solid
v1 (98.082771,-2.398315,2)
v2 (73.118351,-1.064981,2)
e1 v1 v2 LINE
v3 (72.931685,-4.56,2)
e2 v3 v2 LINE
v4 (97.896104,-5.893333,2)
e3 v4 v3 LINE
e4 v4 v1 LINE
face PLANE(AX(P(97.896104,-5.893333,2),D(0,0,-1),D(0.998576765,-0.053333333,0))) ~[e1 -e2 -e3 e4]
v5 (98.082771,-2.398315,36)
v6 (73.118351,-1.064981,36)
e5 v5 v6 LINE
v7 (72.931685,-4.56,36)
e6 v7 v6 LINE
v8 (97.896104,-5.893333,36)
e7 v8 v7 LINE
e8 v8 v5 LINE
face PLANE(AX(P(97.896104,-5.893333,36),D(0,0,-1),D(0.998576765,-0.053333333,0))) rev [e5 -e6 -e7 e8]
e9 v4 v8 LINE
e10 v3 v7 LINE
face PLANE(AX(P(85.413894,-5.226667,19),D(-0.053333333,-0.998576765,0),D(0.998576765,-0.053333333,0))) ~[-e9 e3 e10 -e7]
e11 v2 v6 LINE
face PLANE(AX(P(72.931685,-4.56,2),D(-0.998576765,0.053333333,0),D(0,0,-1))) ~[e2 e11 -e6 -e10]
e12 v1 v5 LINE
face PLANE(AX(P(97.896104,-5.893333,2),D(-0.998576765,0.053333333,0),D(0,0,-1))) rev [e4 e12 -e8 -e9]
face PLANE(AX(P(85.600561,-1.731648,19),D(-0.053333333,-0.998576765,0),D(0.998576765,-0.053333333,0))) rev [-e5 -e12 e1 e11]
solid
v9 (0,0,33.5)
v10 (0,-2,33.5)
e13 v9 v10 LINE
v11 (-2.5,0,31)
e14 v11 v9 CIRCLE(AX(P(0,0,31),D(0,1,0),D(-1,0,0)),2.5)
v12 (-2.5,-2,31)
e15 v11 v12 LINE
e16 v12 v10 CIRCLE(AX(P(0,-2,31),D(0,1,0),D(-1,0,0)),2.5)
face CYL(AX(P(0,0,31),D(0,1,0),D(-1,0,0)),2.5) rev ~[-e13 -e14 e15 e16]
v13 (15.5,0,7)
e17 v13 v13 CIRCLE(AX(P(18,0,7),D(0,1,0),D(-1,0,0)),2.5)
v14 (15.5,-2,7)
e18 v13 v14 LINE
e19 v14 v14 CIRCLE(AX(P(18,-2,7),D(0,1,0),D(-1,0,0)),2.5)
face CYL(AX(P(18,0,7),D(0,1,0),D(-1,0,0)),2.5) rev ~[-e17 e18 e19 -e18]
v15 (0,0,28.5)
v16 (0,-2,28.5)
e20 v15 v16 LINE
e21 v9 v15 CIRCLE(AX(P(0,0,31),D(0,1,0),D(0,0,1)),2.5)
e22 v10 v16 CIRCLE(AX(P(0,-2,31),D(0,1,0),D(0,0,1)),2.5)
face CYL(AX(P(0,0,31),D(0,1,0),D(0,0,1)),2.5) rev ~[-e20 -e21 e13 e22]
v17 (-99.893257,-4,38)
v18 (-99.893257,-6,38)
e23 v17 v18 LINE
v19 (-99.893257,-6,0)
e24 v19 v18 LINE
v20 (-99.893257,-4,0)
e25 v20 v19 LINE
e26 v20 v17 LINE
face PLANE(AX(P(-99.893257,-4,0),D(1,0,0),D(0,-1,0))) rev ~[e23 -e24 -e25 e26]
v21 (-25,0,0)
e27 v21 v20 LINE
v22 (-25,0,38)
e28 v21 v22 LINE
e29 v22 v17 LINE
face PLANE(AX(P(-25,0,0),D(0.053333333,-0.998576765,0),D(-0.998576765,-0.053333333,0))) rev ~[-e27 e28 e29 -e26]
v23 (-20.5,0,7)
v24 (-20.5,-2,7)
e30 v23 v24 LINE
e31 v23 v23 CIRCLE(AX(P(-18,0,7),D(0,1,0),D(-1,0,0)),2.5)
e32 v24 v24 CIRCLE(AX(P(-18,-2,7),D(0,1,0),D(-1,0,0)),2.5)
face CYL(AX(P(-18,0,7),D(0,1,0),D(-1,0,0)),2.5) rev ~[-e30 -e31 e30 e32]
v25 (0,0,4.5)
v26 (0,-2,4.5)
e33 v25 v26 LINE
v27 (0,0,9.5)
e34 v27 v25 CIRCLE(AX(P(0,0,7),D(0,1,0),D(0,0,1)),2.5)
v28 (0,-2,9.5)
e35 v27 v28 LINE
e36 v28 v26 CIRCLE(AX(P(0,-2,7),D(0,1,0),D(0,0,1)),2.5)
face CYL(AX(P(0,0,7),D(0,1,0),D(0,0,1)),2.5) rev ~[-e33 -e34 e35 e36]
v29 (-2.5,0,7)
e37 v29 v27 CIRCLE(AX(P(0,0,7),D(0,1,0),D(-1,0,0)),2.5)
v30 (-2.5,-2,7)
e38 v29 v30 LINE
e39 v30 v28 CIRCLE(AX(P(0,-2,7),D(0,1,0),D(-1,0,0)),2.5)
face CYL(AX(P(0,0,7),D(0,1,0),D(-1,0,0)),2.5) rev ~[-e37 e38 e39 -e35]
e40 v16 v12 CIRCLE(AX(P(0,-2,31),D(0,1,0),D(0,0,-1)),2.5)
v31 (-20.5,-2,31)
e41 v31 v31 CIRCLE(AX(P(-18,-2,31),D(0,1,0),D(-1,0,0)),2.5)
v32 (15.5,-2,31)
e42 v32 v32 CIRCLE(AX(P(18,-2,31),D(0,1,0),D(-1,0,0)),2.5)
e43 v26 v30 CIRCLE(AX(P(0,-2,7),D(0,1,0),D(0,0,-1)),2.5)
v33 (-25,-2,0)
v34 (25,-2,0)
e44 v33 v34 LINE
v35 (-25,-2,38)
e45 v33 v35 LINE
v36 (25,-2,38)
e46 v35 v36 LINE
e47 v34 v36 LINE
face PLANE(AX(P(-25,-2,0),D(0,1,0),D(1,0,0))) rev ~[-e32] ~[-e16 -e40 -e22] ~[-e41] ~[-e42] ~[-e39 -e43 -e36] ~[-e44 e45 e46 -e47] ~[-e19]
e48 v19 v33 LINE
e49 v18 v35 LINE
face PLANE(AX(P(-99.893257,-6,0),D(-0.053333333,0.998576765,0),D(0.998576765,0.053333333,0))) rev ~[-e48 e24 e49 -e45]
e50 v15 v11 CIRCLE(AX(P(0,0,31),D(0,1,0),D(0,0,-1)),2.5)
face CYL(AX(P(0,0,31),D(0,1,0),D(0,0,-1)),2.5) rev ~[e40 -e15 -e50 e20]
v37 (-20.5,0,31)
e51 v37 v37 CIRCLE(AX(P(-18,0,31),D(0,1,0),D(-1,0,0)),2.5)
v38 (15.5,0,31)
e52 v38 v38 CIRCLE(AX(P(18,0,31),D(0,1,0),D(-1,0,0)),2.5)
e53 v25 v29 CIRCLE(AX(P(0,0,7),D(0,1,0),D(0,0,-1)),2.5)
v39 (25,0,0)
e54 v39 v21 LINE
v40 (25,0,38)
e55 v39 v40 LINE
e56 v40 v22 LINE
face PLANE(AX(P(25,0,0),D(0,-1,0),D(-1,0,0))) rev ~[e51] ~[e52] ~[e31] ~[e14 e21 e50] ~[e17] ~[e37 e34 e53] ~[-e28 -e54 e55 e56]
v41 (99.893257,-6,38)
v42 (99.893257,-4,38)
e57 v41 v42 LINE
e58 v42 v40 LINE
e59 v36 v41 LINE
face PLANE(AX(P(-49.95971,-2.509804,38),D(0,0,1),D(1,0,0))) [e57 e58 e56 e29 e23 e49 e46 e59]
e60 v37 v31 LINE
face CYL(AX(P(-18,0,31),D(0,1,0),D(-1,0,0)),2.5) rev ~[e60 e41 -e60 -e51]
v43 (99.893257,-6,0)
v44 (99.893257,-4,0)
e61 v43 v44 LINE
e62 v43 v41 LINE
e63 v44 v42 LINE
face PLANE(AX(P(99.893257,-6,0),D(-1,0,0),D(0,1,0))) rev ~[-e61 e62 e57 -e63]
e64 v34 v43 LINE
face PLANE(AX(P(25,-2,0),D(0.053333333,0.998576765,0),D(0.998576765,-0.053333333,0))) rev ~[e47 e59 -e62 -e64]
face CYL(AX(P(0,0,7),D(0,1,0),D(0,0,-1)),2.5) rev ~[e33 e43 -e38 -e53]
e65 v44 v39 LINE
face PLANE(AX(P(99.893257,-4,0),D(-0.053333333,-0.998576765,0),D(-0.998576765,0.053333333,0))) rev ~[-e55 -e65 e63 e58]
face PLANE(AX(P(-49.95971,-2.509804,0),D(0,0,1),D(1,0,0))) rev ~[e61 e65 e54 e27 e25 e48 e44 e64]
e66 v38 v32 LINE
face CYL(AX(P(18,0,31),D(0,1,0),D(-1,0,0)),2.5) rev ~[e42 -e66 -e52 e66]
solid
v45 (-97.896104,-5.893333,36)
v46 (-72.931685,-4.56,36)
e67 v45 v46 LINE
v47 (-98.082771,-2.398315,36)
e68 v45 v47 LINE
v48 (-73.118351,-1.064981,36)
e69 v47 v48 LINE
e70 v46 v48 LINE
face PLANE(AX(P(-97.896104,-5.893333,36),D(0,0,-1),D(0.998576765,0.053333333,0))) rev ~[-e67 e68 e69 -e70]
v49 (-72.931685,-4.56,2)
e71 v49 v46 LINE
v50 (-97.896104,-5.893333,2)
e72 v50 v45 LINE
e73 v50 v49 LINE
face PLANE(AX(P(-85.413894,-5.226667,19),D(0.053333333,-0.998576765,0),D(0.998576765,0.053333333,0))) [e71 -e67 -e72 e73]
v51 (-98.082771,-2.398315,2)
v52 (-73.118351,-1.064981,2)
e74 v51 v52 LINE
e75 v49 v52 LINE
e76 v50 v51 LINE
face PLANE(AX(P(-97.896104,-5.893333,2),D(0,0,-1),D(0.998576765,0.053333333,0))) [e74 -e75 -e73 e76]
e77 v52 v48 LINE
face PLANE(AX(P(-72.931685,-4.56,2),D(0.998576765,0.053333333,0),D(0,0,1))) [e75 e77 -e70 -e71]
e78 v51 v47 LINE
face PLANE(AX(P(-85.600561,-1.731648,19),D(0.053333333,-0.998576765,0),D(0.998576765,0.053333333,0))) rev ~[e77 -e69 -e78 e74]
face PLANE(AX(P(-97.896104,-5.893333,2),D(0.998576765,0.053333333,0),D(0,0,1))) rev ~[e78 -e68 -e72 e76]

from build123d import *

# Parameters (mm, degrees)
F1_DEPTH = 38
F3_W     = 25
F3_H     = 34
F4_DEPTH = 3.5
F2_R     = 2.5
F6_DEPTH = 25


with BuildPart() as f1:
    # F0 (on Top) → F1 (new body)
    with BuildSketch(Plane.XY):
        Polygon((0, -2), (0, 0), (-25, 0), (-99.8932573734, -4), (-99.8932573734, -6), (-25, -2), align=None)
        Polygon((25, 0), (0, 0), (0, -2), (25, -2), (99.8932573734, -6), (99.8932573734, -4), align=None)
    extrude(amount=F1_DEPTH)

    # F2 (on face) → F6 (cut)
    with BuildSketch(Plane(origin=(0, 0, 0), x_dir=(-1, 0, 0), z_dir=(0, 1, 0))):
        with BuildLine():
            ThreePointArc((2.5, 31), (1.767766953, 32.767766953), (0, 33.5))
            Line((0, 33.5), (0, 28.5))
            ThreePointArc((0, 28.5), (1.767766953, 29.232233047), (2.5, 31))
        make_face()
        with BuildLine():
            ThreePointArc((2.5, 7), (1.767766953, 8.767766953), (0, 9.5))
            Line((0, 9.5), (0, 4.5))
            ThreePointArc((0, 4.5), (1.767766953, 5.232233047), (2.5, 7))
        make_face()
        with BuildLine():
            Line((0, 4.5), (0, 9.5))
            ThreePointArc((0, 9.5), (-2.5, 7), (0, 4.5))
        make_face()
        with BuildLine():
            Line((0, 28.5), (0, 33.5))
            ThreePointArc((0, 33.5), (-2.5, 31), (0, 28.5))
        make_face()
        with Locations((18, 31)):
            Circle(F2_R)
        with Locations((18, 7)):
            Circle(F2_R)
        with Locations((-18, 31)):
            Circle(F2_R)
        with Locations((-18, 7)):
            Circle(F2_R)
    extrude(amount=-F6_DEPTH, mode=Mode.SUBTRACT)


with BuildPart() as f4:
    # F3 (on face) → F4 (new body)
    with BuildSketch(Plane(origin=(0.0354037438, -0.6628754245, 0), x_dir=(0.998576765, 0.0533333333, 0), z_dir=(0.0533333333, -0.998576765, 0))):
        with Locations((-85.5710857911, 19)):
            Rectangle(F3_W, F3_H)
    extrude(amount=-F4_DEPTH)


with BuildPart() as f5_1:
    # F5: instance of F4
    add(f4.part.mirror(Plane.YZ))


solid = Compound([f1.part, f4.part, f5_1.part])
